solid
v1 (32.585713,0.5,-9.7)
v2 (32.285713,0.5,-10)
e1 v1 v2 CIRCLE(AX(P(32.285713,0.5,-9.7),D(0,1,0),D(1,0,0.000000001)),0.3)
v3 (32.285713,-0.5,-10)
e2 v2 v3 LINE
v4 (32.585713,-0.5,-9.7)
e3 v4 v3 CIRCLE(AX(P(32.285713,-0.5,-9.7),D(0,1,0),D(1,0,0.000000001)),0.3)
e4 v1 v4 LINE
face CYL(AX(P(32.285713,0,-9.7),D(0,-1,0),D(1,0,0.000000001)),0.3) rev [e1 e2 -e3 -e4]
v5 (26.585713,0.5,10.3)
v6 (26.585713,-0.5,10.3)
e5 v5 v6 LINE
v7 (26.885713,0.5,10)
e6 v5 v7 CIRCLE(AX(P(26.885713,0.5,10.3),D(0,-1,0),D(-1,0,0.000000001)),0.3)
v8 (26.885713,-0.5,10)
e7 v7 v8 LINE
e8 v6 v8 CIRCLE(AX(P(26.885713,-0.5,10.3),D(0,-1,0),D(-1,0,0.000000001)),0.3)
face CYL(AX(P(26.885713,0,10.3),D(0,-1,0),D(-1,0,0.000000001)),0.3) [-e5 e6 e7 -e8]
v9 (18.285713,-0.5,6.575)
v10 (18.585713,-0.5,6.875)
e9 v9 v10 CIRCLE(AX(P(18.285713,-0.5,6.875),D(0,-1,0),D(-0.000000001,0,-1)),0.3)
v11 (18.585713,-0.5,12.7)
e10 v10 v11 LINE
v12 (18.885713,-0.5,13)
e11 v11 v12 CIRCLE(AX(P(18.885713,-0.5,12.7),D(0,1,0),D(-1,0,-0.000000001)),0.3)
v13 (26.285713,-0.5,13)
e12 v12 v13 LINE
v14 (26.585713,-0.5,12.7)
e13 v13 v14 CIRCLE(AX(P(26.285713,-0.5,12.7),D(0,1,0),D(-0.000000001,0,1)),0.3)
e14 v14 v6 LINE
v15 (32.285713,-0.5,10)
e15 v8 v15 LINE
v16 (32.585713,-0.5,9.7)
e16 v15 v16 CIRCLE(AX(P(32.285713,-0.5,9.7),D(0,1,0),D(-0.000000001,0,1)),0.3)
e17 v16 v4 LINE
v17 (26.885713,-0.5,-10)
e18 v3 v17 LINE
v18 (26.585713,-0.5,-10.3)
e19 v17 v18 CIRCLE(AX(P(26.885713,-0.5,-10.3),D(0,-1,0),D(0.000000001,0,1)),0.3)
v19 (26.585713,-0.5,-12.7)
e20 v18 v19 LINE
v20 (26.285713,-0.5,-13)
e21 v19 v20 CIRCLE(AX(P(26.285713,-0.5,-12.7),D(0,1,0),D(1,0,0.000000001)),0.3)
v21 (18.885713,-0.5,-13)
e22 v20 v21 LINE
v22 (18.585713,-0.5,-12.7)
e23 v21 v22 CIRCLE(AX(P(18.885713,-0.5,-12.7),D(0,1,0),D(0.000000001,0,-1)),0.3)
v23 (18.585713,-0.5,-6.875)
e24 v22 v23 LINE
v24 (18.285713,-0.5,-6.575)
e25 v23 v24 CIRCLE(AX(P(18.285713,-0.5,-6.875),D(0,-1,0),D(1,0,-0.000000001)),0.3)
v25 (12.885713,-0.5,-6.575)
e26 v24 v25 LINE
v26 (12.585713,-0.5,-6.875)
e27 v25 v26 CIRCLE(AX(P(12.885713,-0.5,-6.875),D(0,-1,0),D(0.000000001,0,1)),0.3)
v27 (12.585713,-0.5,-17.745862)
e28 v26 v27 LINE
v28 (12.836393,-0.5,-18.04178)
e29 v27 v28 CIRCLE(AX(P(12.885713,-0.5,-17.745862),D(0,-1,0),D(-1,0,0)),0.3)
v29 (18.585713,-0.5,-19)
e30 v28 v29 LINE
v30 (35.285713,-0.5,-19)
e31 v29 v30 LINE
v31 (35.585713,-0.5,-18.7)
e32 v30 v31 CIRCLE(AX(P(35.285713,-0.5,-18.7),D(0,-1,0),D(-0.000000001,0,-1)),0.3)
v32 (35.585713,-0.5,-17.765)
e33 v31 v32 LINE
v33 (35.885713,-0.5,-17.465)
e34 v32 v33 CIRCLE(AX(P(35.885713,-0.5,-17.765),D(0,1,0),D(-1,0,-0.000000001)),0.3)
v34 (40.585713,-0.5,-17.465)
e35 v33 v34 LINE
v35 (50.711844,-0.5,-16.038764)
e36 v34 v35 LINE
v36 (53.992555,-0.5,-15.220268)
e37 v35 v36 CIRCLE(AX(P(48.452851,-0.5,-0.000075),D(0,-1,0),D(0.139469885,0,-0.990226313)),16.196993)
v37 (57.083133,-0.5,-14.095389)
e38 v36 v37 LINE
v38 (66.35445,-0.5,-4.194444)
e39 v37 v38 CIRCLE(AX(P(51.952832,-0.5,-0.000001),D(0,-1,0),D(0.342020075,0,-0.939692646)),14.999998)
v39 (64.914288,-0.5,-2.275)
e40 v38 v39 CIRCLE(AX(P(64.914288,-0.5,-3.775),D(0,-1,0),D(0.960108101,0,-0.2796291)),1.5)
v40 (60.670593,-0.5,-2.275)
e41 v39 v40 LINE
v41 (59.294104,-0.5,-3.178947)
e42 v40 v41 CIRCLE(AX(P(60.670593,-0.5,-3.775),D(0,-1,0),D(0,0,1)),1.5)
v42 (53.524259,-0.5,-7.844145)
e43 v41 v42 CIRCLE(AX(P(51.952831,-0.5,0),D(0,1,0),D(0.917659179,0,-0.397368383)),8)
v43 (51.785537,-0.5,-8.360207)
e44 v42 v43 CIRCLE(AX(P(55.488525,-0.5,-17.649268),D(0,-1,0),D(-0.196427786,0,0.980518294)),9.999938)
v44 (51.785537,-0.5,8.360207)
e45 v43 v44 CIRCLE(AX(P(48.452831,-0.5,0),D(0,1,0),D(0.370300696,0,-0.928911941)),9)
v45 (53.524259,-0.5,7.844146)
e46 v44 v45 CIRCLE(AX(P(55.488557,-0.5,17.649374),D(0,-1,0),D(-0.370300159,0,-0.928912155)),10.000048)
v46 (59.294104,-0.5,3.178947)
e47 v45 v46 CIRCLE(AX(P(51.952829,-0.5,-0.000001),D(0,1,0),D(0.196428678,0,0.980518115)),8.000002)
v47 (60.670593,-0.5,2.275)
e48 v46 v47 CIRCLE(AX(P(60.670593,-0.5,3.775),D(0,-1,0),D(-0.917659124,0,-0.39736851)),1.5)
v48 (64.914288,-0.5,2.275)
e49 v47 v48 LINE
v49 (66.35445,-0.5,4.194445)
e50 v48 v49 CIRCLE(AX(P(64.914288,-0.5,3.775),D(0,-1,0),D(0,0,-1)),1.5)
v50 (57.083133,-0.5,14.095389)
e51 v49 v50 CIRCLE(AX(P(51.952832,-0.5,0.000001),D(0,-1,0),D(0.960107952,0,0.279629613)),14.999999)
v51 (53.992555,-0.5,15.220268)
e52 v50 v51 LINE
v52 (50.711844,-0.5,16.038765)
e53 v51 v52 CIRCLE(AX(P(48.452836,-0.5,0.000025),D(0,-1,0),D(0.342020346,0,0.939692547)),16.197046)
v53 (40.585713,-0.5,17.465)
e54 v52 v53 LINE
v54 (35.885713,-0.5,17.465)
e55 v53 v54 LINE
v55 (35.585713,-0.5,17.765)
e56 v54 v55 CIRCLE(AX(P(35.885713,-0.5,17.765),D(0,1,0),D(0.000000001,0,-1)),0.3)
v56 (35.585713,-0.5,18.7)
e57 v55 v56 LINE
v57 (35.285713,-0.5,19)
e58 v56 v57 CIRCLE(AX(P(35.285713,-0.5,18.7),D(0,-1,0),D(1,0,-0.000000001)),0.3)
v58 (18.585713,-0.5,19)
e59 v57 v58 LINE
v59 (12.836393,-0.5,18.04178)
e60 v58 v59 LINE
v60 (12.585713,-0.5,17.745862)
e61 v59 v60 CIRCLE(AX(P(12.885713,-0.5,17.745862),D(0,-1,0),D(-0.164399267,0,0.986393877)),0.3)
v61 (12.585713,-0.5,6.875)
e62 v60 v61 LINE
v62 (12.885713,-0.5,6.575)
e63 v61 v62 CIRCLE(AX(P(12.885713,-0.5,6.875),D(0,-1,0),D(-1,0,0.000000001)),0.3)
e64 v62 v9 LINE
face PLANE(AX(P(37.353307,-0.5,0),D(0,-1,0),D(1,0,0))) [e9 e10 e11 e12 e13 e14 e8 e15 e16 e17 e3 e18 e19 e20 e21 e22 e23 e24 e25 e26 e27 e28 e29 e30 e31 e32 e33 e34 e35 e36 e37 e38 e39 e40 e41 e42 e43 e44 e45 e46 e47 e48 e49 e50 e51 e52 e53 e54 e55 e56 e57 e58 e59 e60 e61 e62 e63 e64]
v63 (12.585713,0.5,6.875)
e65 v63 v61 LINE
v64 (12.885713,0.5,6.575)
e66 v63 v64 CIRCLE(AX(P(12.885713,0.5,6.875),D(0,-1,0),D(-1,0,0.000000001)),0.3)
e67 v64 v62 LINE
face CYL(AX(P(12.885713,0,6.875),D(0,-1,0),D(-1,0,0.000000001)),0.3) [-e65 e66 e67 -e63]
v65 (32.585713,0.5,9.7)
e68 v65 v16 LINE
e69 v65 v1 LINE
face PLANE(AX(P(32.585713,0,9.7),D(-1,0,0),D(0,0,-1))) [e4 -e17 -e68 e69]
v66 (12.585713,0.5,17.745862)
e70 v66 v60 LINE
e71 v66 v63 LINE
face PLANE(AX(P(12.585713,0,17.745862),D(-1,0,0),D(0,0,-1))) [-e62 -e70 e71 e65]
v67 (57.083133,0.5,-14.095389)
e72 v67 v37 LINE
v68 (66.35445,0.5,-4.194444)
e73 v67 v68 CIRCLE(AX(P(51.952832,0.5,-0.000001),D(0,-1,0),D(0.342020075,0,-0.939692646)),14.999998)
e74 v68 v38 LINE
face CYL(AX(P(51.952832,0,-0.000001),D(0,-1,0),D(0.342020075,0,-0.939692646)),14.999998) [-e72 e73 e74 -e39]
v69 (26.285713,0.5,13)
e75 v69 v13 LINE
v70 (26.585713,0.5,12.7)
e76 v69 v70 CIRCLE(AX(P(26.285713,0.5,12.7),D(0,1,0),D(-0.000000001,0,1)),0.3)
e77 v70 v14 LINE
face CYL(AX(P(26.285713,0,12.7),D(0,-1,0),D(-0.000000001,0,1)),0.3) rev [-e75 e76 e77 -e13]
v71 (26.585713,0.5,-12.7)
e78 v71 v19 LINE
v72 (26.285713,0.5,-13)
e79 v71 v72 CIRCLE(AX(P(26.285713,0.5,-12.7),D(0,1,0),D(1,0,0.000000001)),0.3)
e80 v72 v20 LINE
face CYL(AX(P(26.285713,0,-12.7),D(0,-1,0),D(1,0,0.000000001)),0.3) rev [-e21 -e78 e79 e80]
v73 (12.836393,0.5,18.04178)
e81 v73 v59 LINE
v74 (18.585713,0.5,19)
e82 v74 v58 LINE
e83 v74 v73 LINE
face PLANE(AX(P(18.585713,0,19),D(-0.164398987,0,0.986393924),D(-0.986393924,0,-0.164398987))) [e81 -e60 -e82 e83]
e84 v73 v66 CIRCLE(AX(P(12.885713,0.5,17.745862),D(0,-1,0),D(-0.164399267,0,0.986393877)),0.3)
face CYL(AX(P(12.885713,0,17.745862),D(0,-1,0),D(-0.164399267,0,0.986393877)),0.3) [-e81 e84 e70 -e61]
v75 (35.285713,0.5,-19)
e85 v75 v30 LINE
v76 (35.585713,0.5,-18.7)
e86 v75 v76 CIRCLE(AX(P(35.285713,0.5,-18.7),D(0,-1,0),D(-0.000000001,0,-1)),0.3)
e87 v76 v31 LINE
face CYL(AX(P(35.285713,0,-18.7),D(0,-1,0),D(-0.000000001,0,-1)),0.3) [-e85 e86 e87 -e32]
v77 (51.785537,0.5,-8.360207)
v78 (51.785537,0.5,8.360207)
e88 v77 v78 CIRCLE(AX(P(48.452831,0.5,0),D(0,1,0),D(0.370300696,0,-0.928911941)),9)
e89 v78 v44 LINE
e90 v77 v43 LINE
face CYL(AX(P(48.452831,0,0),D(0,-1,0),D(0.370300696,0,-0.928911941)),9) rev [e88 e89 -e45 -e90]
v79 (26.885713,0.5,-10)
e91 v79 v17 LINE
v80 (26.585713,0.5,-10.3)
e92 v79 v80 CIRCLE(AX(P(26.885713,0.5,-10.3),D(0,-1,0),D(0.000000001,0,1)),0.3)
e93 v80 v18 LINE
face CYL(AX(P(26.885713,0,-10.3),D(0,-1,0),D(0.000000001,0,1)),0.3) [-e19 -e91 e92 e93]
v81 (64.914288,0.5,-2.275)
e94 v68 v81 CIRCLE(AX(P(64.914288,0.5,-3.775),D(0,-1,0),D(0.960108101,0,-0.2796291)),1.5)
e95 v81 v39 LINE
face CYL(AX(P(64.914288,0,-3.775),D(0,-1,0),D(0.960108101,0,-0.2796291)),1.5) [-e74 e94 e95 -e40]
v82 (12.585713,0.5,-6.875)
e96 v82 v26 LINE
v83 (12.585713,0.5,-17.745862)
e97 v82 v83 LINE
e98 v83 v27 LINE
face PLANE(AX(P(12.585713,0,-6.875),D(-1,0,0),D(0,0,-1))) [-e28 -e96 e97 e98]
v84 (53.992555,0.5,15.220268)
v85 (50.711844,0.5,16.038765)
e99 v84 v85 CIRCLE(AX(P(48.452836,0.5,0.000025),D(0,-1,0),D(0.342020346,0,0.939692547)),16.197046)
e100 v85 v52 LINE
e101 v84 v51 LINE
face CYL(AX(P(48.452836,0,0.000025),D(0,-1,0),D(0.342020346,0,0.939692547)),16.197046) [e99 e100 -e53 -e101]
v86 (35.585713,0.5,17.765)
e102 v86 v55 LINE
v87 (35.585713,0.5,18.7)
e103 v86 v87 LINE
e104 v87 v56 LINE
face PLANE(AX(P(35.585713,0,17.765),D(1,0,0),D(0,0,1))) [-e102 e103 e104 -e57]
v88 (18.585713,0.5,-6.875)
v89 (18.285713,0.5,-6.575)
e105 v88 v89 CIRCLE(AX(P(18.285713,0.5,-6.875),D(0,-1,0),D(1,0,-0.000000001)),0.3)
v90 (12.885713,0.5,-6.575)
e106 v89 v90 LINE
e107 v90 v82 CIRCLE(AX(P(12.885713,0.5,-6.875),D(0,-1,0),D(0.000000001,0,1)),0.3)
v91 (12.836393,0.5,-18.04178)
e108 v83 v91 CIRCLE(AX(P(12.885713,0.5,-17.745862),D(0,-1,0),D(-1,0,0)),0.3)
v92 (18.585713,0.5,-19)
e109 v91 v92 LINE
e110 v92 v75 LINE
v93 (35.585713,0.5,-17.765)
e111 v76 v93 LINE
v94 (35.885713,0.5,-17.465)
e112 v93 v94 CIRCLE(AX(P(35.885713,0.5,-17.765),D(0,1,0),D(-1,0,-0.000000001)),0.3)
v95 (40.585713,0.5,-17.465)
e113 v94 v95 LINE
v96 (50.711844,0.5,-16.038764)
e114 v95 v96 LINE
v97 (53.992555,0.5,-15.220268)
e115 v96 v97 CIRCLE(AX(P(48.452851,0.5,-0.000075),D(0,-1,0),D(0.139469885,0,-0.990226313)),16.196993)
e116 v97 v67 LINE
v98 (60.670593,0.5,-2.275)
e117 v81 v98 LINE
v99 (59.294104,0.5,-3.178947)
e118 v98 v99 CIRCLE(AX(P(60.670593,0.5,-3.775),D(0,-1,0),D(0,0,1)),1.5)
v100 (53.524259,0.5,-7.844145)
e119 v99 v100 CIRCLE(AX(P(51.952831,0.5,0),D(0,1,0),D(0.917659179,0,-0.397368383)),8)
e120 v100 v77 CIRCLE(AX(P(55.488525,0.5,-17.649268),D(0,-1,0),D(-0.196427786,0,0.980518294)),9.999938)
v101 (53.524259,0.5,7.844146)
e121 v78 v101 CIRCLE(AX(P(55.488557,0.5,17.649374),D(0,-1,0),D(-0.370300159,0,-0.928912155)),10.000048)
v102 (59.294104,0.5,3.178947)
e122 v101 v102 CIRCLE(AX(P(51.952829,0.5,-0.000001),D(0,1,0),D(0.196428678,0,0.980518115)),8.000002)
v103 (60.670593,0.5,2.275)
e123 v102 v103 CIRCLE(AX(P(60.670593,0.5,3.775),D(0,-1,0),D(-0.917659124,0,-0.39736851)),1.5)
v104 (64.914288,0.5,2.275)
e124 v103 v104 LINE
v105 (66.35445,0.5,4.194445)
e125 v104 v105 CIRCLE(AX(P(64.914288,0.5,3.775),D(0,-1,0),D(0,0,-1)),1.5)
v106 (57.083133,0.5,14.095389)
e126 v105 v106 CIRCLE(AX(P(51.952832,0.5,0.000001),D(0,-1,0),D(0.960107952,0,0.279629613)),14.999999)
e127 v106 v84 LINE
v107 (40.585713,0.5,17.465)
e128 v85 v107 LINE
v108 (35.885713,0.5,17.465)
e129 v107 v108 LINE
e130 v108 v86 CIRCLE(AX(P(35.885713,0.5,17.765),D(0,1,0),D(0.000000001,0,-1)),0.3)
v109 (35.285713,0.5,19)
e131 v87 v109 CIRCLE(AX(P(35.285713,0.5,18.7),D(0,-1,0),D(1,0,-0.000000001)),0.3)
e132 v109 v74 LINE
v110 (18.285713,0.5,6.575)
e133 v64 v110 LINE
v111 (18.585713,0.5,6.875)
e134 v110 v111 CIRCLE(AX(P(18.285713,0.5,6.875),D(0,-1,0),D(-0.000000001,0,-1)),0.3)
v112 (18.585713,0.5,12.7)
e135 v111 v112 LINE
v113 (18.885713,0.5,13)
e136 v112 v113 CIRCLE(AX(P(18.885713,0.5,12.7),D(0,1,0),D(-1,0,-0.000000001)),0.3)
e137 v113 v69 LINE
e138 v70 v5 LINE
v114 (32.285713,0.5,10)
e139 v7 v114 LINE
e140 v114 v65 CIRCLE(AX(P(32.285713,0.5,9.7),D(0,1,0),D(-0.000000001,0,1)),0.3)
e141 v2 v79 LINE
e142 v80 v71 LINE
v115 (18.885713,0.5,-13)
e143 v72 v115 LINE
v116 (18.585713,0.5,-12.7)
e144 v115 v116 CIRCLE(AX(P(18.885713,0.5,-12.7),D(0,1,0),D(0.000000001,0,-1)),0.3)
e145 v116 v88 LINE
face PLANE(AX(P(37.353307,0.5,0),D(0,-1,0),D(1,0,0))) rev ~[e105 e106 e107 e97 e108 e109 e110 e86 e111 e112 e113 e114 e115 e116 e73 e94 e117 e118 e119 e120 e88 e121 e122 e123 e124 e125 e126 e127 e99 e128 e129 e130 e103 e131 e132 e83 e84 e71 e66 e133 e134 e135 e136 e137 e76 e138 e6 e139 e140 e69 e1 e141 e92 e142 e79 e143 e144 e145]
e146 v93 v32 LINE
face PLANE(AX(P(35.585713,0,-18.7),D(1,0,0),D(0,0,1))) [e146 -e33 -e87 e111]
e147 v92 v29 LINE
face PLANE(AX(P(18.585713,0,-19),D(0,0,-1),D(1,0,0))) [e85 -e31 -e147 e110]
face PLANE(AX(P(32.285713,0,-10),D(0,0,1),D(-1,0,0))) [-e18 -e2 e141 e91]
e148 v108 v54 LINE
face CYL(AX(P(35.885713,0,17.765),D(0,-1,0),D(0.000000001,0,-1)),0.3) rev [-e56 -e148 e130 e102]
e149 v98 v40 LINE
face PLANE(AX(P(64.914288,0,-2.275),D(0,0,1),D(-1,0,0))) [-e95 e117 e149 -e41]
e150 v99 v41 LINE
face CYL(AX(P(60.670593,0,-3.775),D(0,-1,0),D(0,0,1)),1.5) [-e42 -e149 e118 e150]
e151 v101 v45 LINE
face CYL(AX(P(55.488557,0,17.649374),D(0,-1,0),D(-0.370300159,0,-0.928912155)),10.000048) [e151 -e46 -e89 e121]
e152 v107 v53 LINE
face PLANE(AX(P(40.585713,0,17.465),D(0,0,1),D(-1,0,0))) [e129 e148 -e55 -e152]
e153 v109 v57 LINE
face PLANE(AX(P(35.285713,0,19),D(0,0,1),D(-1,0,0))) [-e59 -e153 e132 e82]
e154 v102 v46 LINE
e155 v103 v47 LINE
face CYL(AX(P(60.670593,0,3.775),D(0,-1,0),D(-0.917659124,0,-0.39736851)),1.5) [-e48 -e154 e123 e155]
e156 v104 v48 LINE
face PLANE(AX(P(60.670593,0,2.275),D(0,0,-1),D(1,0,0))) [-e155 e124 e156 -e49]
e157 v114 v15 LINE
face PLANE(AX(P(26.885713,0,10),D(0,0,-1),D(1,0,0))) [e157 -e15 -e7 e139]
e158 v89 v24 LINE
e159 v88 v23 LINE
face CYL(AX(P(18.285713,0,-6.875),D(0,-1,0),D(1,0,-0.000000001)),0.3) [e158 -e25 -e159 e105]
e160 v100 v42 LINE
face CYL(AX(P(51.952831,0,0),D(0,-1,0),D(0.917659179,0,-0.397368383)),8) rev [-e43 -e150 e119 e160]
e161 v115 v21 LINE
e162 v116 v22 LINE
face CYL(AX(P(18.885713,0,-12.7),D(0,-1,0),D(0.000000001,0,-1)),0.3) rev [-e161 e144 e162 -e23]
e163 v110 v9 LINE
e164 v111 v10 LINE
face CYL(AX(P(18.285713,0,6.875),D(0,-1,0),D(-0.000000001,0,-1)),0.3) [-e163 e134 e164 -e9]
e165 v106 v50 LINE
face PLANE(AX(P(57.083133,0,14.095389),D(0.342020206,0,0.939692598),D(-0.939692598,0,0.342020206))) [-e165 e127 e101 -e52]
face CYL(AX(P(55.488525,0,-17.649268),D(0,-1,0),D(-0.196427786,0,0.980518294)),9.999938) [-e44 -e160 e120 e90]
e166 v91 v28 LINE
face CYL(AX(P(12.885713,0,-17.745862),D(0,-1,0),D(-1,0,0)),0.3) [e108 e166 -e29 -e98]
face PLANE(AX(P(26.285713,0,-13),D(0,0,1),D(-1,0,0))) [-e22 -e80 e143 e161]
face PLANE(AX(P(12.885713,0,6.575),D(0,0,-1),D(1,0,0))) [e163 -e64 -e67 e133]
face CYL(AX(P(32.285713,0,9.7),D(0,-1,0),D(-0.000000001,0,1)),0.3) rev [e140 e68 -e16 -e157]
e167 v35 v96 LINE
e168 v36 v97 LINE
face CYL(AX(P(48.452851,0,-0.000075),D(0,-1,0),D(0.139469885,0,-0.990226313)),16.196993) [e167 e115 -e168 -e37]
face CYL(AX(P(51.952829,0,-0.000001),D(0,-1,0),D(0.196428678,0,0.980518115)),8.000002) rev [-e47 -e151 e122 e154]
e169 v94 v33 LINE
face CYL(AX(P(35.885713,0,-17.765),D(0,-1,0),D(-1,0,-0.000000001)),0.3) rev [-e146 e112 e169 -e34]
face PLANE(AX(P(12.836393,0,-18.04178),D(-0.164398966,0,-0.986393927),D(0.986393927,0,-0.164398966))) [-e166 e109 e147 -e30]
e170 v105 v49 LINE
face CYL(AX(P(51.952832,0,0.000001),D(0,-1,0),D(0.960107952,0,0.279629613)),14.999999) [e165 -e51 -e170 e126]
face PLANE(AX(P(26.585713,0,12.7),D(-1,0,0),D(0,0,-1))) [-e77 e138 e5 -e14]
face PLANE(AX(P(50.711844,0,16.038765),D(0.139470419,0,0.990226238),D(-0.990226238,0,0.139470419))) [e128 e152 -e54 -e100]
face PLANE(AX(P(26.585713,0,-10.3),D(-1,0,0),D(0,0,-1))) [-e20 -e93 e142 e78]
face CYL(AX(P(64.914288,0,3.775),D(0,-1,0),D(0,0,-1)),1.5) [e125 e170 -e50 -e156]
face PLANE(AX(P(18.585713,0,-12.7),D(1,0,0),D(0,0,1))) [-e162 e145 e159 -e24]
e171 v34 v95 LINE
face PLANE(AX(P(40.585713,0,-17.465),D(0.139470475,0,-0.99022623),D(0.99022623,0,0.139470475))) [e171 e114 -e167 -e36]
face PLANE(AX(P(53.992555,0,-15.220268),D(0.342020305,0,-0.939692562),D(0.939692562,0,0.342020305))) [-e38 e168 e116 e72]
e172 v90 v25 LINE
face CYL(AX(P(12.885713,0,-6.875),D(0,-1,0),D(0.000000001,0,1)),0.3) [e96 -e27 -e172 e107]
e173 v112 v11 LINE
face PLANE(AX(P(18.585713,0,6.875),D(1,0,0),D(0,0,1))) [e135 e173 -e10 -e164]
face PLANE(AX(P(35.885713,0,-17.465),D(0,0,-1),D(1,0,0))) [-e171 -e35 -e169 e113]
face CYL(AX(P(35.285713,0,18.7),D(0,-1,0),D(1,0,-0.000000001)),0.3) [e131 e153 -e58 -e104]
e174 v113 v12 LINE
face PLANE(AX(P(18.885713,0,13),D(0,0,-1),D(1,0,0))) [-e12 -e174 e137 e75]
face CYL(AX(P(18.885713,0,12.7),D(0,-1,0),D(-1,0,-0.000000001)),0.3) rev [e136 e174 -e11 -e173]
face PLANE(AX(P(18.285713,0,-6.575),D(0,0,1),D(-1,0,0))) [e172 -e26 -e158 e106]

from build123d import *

# Parameters (mm, degrees)
F1_DEPTH = 0.5


# Not quite as in the source:
# - ends of sketch curves that miss each other by under 0.0002 mm in the source are joined


with BuildPart() as f1:
    # F0 (on Front) → F1 (new body, symmetric)
    with BuildSketch(Plane.XZ):
        with BuildLine():
            Line((53.992555, -15.220268), (57.083133, -14.095389))
            ThreePointArc((57.083133, -14.095389), (62.9018568836, -10.252747544), (66.3544503107, -4.1944440905))
            ThreePointArc((66.3544503107, -4.1944440905), (66.1141142416, -2.8747683688), (64.914288, -2.275))
            Line((64.914288, -2.275), (60.670593, -2.275))
            ThreePointArc((60.670593, -2.275), (59.8472095147, -2.5211899521), (59.2941043505, -3.1789471518))
            ThreePointArc((59.2941043505, -3.1789471518), (56.9827494729, -6.2209259886), (53.52425904, -7.8441451998))
            ThreePointArc((53.52425904, -7.8441451998), (52.6431740995, -8.0626756758), (51.7855370008, -8.3602070021))
            ThreePointArc((51.7855370008, -8.3602070021), (39.452831, 0), (51.7855371982, 8.3602074972))
            ThreePointArc((51.7855371982, 8.3602074972), (52.6431743712, 8.0626765952), (53.524259133, 7.844145664))
            ThreePointArc((53.524259133, 7.844145664), (56.9827494729, 6.2209259886), (59.2941043849, 3.1789471667))
            ThreePointArc((59.2941043849, 3.1789471667), (59.8472095147, 2.5211899521), (60.670593, 2.275))
            Line((60.670593, 2.275), (64.914288, 2.275))
            ThreePointArc((64.914288, 2.275), (66.1141145297, 2.8747687527), (66.3544497778, 4.1944449353))
            ThreePointArc((66.3544497778, 4.1944449353), (62.9018565554, 10.2527478944), (57.0831331177, 14.0953893235))
            Line((57.0831331177, 14.0953893235), (53.992555, 15.220268))
            ThreePointArc((53.992555, 15.220268), (52.3736165632, 15.715360306), (50.7118440801, 16.0387645685))
            Line((50.7118440801, 16.0387645685), (40.585713, 17.465))
            Line((40.585713, 17.465), (35.885713, 17.465))
            ThreePointArc((35.885713, 17.465), (35.6735809656, 17.5528679656), (35.585713, 17.765))
            Line((35.585713, 17.765), (35.585713, 18.7))
            ThreePointArc((35.585713, 18.7), (35.4978450344, 18.9121320344), (35.285713, 19))
            Line((35.285713, 19), (18.585713, 19))
            Line((18.585713, 19), (12.836393, 18.04178))
            ThreePointArc((12.836393, 18.04178), (12.656806899, 17.9397743434), (12.585713, 17.745862))
            Line((12.585713, 17.745862), (12.585713, 6.875))
            ThreePointArc((12.585713, 6.875), (12.6735809656, 6.6628679656), (12.885713, 6.575))
            Line((12.885713, 6.575), (18.285713, 6.575))
            ThreePointArc((18.285713, 6.575), (18.4978450344, 6.6628679656), (18.585713, 6.875))
            Line((18.585713, 6.875), (18.585713, 12.7))
            ThreePointArc((18.585713, 12.7), (18.6735809656, 12.9121320344), (18.885713, 13))
            Line((18.885713, 13), (26.285713, 13))
            ThreePointArc((26.285713, 13), (26.4978450344, 12.9121320344), (26.585713, 12.7))
            Line((26.585713, 12.7), (26.585713, 10.3))
            ThreePointArc((26.585713, 10.3), (26.6735809656, 10.0878679656), (26.885713, 10))
            Line((26.885713, 10), (32.285713, 10))
            ThreePointArc((32.285713, 10), (32.4978450344, 9.9121320344), (32.585713, 9.7))
            Line((32.585713, 9.7), (32.585713, -9.7))
            ThreePointArc((32.585713, -9.7), (32.4978450344, -9.9121320344), (32.285713, -10))
            Line((32.285713, -10), (26.885713, -10))
            ThreePointArc((26.885713, -10), (26.6735809656, -10.0878679656), (26.585713, -10.3))
            Line((26.585713, -10.3), (26.585713, -12.7))
            ThreePointArc((26.585713, -12.7), (26.4978450344, -12.9121320344), (26.285713, -13))
            Line((26.285713, -13), (18.885713, -13))
            ThreePointArc((18.885713, -13), (18.6735809656, -12.9121320344), (18.585713, -12.7))
            Line((18.585713, -12.7), (18.585713, -6.875))
            ThreePointArc((18.585713, -6.875), (18.4978450344, -6.6628679656), (18.285713, -6.575))
            Line((18.285713, -6.575), (12.885713, -6.575))
            ThreePointArc((12.885713, -6.575), (12.6735809656, -6.6628679656), (12.585713, -6.875))
            Line((12.585713, -6.875), (12.585713, -17.745862))
            ThreePointArc((12.585713, -17.745862), (12.656806899, -17.9397743434), (12.8363929795, -18.0417801231))
            Line((12.8363929795, -18.0417801231), (18.585713, -19))
            Line((18.585713, -19), (35.285713, -19))
            ThreePointArc((35.285713, -19), (35.4978450344, -18.9121320344), (35.585713, -18.7))
            Line((35.585713, -18.7), (35.585713, -17.765))
            ThreePointArc((35.585713, -17.765), (35.6735809656, -17.5528679656), (35.885713, -17.465))
            Line((35.885713, -17.465), (40.585713, -17.465))
            Line((40.585713, -17.465), (50.711844, -16.038764))
            ThreePointArc((50.711844, -16.038764), (52.3736165632, -15.715360306), (53.992555, -15.220268))
        make_face()
    extrude(amount=F1_DEPTH, both=True)


solid = f1.part
